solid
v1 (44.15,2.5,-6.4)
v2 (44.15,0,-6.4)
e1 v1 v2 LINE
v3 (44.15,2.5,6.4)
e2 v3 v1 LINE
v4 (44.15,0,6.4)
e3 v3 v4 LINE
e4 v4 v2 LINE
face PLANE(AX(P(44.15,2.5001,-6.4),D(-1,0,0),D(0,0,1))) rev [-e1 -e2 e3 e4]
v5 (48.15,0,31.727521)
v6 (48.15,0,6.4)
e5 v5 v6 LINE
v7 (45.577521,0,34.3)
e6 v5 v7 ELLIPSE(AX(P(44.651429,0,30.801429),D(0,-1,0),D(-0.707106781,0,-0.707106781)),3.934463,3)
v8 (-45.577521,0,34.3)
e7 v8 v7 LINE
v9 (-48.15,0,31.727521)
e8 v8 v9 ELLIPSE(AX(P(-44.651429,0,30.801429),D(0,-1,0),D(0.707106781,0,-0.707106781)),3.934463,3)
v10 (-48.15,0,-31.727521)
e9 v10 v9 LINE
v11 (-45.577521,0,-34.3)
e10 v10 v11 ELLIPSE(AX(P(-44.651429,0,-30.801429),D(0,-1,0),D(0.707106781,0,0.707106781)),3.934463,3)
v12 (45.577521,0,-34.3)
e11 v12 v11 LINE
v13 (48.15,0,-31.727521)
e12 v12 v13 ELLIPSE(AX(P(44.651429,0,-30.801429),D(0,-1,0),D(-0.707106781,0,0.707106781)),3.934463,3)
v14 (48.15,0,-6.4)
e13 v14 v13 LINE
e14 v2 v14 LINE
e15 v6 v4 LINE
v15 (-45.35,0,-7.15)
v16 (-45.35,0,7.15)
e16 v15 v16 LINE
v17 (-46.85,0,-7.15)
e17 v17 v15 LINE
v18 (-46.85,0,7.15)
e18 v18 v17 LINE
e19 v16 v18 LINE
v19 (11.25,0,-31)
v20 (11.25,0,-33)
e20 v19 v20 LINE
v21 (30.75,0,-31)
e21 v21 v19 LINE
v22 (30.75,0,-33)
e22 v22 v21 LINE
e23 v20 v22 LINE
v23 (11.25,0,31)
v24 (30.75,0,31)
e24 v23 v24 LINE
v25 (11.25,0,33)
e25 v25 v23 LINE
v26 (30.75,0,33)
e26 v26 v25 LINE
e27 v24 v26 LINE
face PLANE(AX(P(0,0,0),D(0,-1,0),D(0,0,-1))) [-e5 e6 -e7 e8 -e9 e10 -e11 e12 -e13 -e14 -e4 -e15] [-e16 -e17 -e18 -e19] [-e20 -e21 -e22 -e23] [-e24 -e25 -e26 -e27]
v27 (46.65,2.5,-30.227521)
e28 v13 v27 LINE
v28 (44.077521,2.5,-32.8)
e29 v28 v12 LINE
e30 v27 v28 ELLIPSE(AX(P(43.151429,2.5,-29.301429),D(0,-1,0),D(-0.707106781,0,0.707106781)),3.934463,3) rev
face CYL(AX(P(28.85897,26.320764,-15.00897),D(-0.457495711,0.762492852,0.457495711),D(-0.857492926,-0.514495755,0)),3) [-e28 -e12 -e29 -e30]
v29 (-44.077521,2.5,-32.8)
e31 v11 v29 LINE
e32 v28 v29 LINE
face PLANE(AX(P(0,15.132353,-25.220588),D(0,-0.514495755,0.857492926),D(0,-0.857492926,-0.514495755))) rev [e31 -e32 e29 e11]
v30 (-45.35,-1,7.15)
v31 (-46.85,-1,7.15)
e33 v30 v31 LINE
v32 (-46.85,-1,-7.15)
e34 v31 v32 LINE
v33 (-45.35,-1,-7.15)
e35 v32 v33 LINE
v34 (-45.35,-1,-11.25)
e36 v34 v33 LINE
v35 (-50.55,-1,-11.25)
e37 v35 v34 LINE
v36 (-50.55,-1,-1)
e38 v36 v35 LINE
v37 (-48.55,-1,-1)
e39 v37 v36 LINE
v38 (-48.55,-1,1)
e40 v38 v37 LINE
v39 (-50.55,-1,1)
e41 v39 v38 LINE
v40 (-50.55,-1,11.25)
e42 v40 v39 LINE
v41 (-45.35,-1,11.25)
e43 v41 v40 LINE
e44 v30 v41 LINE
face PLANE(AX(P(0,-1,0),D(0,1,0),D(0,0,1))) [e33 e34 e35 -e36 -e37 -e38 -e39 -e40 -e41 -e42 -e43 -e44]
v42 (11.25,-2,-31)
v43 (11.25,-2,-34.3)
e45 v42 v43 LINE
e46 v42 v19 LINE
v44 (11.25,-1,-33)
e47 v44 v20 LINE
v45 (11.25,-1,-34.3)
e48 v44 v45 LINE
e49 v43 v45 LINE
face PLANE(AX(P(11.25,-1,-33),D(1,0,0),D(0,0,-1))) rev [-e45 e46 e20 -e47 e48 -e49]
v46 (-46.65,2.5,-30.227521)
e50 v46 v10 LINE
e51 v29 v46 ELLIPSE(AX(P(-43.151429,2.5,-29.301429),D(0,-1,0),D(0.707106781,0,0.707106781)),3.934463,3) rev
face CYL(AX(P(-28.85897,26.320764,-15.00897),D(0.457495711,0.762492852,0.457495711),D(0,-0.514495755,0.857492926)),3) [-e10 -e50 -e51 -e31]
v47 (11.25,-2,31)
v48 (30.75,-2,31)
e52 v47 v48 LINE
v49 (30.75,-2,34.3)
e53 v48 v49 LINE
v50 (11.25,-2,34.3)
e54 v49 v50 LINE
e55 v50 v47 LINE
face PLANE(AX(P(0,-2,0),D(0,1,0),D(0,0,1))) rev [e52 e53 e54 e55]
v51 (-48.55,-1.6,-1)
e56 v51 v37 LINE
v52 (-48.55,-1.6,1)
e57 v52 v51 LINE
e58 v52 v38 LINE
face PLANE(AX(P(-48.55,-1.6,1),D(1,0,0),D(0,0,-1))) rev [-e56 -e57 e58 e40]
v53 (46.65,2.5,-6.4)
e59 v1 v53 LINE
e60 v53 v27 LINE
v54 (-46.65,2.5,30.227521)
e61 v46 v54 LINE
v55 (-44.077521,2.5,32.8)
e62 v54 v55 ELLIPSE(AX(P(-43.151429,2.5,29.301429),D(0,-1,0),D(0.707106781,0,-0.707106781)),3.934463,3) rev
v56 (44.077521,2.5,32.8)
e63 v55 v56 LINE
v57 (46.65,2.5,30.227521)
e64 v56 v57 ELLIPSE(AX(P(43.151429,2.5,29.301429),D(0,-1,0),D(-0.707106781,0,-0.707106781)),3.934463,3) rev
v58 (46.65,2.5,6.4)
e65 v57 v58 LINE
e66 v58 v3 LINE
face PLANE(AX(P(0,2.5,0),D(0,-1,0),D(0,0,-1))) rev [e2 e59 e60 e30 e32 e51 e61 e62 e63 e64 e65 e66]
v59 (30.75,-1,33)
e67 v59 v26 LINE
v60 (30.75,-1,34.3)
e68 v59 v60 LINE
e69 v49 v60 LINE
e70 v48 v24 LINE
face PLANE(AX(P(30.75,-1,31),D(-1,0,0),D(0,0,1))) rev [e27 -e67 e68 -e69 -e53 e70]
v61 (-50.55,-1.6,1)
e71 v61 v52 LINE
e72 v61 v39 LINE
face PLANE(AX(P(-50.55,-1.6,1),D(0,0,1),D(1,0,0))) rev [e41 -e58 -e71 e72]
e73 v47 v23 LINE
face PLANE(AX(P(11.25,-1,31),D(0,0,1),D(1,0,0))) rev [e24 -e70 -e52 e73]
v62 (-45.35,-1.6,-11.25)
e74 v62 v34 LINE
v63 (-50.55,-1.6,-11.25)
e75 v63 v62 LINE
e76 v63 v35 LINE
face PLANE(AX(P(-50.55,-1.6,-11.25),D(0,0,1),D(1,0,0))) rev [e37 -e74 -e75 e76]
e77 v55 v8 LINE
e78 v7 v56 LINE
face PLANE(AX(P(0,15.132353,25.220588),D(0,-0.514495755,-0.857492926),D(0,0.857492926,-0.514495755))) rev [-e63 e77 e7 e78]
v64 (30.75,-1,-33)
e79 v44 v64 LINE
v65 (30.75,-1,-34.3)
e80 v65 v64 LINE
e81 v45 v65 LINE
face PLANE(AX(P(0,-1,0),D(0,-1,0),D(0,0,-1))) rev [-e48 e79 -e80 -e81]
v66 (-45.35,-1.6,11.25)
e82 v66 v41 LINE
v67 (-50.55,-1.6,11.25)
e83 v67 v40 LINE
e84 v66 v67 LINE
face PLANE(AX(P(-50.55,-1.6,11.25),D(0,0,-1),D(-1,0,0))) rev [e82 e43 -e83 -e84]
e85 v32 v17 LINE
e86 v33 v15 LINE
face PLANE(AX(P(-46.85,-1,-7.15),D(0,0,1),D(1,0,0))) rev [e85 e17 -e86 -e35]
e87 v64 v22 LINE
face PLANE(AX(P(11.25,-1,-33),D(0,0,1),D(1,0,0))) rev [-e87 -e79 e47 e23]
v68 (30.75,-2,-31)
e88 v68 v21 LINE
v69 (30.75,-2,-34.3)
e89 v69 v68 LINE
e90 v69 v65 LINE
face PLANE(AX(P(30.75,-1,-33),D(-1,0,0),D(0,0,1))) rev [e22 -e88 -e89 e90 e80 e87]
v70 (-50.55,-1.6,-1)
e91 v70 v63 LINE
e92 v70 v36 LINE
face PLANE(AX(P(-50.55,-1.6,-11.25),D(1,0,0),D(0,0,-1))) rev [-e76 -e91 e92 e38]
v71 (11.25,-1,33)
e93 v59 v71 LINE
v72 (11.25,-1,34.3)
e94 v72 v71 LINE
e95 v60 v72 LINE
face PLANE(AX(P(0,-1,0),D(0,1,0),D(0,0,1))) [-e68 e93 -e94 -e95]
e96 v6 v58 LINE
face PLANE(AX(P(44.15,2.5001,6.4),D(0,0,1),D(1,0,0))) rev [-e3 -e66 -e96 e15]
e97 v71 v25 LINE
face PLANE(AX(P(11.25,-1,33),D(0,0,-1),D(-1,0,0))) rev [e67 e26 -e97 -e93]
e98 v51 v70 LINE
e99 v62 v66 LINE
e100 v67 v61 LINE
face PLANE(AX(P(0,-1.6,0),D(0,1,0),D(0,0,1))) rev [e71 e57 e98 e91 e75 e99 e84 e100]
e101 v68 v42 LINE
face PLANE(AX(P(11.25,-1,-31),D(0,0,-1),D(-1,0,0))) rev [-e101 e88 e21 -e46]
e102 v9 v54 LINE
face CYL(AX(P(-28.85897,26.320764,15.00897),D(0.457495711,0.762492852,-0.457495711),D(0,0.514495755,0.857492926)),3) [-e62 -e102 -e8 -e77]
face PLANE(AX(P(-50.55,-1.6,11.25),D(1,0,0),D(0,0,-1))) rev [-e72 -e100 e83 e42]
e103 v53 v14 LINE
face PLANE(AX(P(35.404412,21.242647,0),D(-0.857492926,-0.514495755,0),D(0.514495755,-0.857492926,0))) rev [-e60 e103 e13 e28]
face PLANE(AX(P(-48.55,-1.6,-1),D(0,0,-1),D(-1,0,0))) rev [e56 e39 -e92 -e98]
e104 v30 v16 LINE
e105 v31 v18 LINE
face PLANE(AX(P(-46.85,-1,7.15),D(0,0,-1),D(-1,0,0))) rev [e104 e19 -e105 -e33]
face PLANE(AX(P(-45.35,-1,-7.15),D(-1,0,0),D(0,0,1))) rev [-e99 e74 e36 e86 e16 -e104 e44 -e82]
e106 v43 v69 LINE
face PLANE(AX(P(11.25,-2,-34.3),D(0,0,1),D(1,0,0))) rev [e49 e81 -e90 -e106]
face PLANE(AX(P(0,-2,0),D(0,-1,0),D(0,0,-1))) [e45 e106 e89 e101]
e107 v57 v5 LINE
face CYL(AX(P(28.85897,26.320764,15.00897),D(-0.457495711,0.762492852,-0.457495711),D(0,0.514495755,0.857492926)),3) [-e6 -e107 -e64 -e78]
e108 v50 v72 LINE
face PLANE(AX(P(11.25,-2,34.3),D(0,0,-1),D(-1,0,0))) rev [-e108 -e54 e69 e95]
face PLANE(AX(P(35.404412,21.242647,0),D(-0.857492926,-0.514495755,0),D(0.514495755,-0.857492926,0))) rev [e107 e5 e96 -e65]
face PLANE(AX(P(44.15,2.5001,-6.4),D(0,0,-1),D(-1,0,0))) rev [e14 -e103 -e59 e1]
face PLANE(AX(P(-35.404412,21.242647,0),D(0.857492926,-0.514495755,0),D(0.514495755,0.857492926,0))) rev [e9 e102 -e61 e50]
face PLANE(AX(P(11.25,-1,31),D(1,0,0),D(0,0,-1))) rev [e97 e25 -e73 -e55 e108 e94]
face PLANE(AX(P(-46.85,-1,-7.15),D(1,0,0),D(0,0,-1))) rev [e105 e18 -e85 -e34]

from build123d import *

# Parameters (mm, degrees)
SKETCH3_W           = 4
SKETCH3_H           = 12.8
CUT_EXTRUDE1_DEPTH  = 60.170622077
SKETCH4_W           = 19.5
SKETCH4_H           = 2
SKETCH4_W_2         = 1.5
SKETCH4_H_2         = 14.3
BOSS_EXTRUDE1_DEPTH = 1
BOSS_EXTRUDE2_DEPTH = 0.6
SKETCH6_W           = 19.5
SKETCH6_H           = 3.3
BOSS_EXTRUDE3_DEPTH = 1
FILLET1_R           = 3


with BuildPart() as part:
    # Sketch1 → Loft1 section 0
    with BuildSketch(Plane(origin=(0, 0, 0), x_dir=(1, 0, 0), z_dir=(0, 1, 0))):
        with BuildLine():
            Line((-48.15, -34.3), (48.15, -34.3))
            Line((48.15, -34.3), (48.15, 34.3))
            Line((48.15, 34.3), (-48.15, 34.3))
            Line((-48.15, 34.3), (-48.15, -34.3))
        make_face()
    # Sketch2 → Loft1 section 1
    with BuildSketch(Plane(origin=(0, 2.5, 0), x_dir=(1, 0, 0), z_dir=(0, 1, 0))):
        with BuildLine():
            Line((-46.65, -32.8), (46.65, -32.8))
            Line((46.65, -32.8), (46.65, 32.8))
            Line((46.65, 32.8), (-46.65, 32.8))
            Line((-46.65, 32.8), (-46.65, -32.8))
        make_face()
    loft()

    # Sketch3 → Cut-Extrude1 (cut, through all)
    with BuildSketch(Plane.XZ):
        with Locations((46.15, 0)):
            Rectangle(SKETCH3_W, SKETCH3_H)
    extrude(amount=-CUT_EXTRUDE1_DEPTH, mode=Mode.SUBTRACT)

    # Sketch4 → Boss-Extrude1 (add)
    with BuildSketch(Plane.XZ):
        with Locations((21, 32)):
            Rectangle(SKETCH4_W, SKETCH4_H)
        with Locations((21, -32)):
            Rectangle(SKETCH4_W, SKETCH4_H)
        with Locations((-46.1, 0)):
            Rectangle(SKETCH4_W_2, SKETCH4_H_2)
    extrude(amount=BOSS_EXTRUDE1_DEPTH)

    # Sketch5 → Boss-Extrude2 (add)
    with BuildSketch(Plane.XZ.offset(1)):
        Polygon((-50.55, -11.25), (-45.35, -11.25), (-45.35, 11.25), (-50.55, 11.25), (-50.55, 1), (-48.55, 1), (-48.55, -1), (-50.55, -1), align=None)
    extrude(amount=BOSS_EXTRUDE2_DEPTH)

    # Sketch6 → Boss-Extrude3 (add)
    with BuildSketch(Plane.XZ.offset(1)):
        with Locations((21, 32.65)):
            Rectangle(SKETCH6_W, SKETCH6_H)
        with Locations((21, -32.65)):
            Rectangle(SKETCH6_W, SKETCH6_H)
    extrude(amount=BOSS_EXTRUDE3_DEPTH)

    # Fillet1
    # the kernel refuses this fillet: 3 mm, written as the material it takes off along each edge
    with BuildSketch(Plane(origin=(-50.76627907, -4.360465116, 36.91627907), x_dir=(-0.23537960143467007, -0.3922993357244589, -0.8892118276421003), z_dir=(0.4574957109978059, 0.7624928516630279, -0.45749571099781455)), Plane(origin=(50.76627907, -4.360465116, -36.91627907), x_dir=(0.2353796014346717, -0.39229933572445586, 0.8892118276421013), z_dir=(-0.4574957109978127, 0.7624928516630248, 0.4574957109978127)), Plane(origin=(-50.76627907, -4.360465116, -36.91627907), x_dir=(0.8892118276421047, -0.39229933572444886, -0.23537960143466988), z_dir=(0.4574957109978059, 0.7624928516630279, 0.45749571099781455))) as fillet1_piece_1:
        with BuildLine():
            CenterArc((FILLET1_R * 0.762492851663, -FILLET1_R), FILLET1_R, 90, 74.650522983)
            Line((-FILLET1_R * 0.201836343087, -FILLET1_R * 0.735294117647), (0, 0))
            Line((0, 0), (FILLET1_R * 0.762492851663, 0))
        make_face()
    extrude(amount=14.716112037, mode=Mode.SUBTRACT)
    with BuildSketch(Plane(origin=(50.76627907, -4.360465116, 36.91627907), x_dir=(0.2353796014346717, -0.39229933572445586, -0.8892118276421013), z_dir=(-0.4574957109978127, 0.7624928516630248, -0.4574957109978127))) as fillet1_piece_2:
        with BuildLine():
            CenterArc((FILLET1_R * 0.762492851663, FILLET1_R), FILLET1_R, 195.349477017, 74.650522983)
            Line((-FILLET1_R * 0.201836343087, FILLET1_R * 0.735294117647), (0, 0))
            Line((0, 0), (FILLET1_R * 0.762492851663, 0))
        make_face()
    extrude(amount=14.716112037, mode=Mode.SUBTRACT)


solid = part.part
